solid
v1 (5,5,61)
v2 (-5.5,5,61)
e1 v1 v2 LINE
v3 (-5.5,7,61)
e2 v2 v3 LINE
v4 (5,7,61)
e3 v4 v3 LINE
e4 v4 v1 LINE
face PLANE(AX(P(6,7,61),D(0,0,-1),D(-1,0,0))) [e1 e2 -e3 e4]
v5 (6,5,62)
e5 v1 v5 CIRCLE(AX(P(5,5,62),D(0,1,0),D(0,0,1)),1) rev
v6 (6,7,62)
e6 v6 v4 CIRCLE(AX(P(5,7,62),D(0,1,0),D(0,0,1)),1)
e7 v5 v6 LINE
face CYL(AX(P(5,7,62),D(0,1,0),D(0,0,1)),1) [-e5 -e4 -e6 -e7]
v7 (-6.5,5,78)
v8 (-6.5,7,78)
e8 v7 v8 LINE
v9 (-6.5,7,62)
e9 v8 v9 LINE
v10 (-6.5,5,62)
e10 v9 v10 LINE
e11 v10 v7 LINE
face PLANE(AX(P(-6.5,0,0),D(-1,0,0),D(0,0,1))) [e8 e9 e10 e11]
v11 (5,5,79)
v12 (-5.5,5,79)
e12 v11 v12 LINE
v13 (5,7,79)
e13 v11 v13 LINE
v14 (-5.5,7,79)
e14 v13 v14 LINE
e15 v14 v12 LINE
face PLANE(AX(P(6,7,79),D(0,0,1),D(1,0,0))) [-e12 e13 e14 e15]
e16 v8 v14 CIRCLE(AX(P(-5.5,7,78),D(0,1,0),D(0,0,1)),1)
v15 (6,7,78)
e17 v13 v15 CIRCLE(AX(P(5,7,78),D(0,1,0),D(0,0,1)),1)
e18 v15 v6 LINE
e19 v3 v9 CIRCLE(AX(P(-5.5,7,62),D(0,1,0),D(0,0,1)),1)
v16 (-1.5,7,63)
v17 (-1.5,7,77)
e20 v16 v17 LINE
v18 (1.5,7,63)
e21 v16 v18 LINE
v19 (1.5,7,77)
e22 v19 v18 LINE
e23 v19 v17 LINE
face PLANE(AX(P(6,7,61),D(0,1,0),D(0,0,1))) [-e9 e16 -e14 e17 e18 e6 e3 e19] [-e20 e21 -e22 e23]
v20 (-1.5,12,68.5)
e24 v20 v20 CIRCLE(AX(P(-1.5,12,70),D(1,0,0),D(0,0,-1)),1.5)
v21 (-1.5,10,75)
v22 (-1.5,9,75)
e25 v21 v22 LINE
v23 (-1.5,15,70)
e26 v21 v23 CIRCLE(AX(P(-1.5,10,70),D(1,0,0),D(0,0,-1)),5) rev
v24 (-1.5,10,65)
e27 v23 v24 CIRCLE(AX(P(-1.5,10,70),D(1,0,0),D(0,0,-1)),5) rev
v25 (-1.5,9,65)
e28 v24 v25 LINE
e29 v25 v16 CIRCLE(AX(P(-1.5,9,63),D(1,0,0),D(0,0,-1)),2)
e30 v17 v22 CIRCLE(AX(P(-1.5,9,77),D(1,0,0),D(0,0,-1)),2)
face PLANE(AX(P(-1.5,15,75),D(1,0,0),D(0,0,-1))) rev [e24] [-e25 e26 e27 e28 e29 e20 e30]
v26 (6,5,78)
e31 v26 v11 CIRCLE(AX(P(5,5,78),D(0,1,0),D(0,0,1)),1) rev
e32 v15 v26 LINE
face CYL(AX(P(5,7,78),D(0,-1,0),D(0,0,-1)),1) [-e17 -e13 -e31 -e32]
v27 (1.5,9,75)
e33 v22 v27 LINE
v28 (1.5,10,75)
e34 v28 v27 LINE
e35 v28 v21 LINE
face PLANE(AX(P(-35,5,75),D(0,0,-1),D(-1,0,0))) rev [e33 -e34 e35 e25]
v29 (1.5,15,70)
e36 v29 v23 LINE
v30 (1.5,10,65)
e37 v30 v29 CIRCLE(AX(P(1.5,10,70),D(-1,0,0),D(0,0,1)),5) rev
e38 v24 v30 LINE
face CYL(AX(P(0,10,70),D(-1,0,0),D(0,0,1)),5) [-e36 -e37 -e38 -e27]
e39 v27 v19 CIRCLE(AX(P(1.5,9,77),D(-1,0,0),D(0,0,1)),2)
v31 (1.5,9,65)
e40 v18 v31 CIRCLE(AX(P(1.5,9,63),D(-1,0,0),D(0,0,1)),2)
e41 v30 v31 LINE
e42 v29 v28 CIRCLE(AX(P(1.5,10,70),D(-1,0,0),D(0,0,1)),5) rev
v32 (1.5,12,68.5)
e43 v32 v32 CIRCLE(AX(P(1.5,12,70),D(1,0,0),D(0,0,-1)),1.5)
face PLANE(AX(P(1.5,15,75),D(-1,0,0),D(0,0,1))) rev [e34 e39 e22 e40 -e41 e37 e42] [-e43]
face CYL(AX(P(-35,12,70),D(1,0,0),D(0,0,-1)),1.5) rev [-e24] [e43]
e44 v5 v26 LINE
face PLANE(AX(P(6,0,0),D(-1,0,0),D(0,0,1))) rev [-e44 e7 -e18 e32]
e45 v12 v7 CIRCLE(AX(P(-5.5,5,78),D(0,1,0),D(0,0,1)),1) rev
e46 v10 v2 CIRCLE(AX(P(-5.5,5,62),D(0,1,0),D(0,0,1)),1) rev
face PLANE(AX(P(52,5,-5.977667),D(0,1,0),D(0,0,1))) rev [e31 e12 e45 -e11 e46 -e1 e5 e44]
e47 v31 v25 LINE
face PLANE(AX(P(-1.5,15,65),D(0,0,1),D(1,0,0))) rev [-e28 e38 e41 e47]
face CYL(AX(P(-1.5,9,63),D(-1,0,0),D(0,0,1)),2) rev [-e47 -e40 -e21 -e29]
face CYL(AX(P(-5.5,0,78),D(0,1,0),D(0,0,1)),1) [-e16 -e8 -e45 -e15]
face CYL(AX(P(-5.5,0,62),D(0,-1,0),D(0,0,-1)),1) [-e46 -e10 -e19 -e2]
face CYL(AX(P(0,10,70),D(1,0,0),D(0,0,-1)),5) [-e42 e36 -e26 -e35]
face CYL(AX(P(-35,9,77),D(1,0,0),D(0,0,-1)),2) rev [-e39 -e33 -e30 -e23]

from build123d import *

# Parameters (mm, degrees)
SKETCH1_W                = 70
SKETCH1_H                = 150
BOSS_EXTRUDE1_DEPTH      = 5
SKETCH2_W                = 3
SKETCH2_H                = 15
BOSS_EXTRUDE3_DEPTH      = 20
SKETCH2_5_W              = 16
SKETCH2_5_H              = 22
SKETCH2_5_W_2            = 3
SKETCH2_5_H_2            = 15
BOSS_EXTRUDE4_DEPTH      = 5
CHAMFER1_SIZE            = 3
SKETCH3_R                = 3
CUT_EXTRUDE1_DEPTH       = 89.600225733
CHAMFER3_SIZE            = 1
CHAMFER4_SIZE            = 1
CHAMFER5_SIZE            = 3
CHAMFER6_SIZE            = 3
CHAMFER7_SIZE            = 20
CHAMFER8_SIZE            = 10
SKETCH4_W                = 3
SKETCH4_H                = 10
BOSS_EXTRUDE5_DEPTH      = 10
SKETCH6_R                = 1.5
CUT_EXTRUDE2_DEPTH       = 88.076116128
FILLET1_R                = 5
CHAMFER10_SIZE           = 1
CUT_EXTRUDE3_DEPTH       = 87
BOSS_EXTRUDE6_DEPTH      = 5
BOSS_EXTRUDE6_DEPTH_BACK = 7.5
SKETCH8_W                = 18
SKETCH8_H                = 2
FILLET2_R                = 2
FILLET3_R                = 1


# Some blends are built 0.0001 mm under size
with BuildPart() as part:
    # Sketch1 → Boss-Extrude1 (new body)
    with BuildSketch(Plane(origin=(0, 0, 0), x_dir=(1, 0, 0), z_dir=(0, 1, 0))):
        Rectangle(SKETCH1_W, SKETCH1_H)
    extrude(amount=BOSS_EXTRUDE1_DEPTH)

    # Sketch2 → Boss-Extrude3 (add)
    with BuildSketch(Plane(origin=(0, 5, 0), x_dir=(1, 0, 0), z_dir=(0, 1, 0))):
        with Locations((3.5, 62.5)):
            Rectangle(SKETCH2_W, SKETCH2_H)
        with Locations((-3.5, 62.5)):
            Rectangle(SKETCH2_W, SKETCH2_H)
    extrude(amount=BOSS_EXTRUDE3_DEPTH)

    # Sketch2<5> → Boss-Extrude4 (add)
    with BuildSketch(Plane(origin=(0, 5, 0), x_dir=(1, 0, 0), z_dir=(0, 1, 0))):
        with Locations((0, 62.5)):
            Rectangle(SKETCH2_5_W, SKETCH2_5_H)
        with Locations((-3.5, 62.5)):
            Rectangle(SKETCH2_5_W_2, SKETCH2_5_H_2, mode=Mode.SUBTRACT)
        with Locations((3.5, 62.5)):
            Rectangle(SKETCH2_5_W_2, SKETCH2_5_H_2, mode=Mode.SUBTRACT)
    extrude(amount=BOSS_EXTRUDE4_DEPTH)

    # Chamfer1
    chamfer1_edges = [part.edges().sort_by_distance(p)[0] for p in [
        (0, 10, -73.5),
        (0, 10, -51.5),
    ]]
    chamfer(chamfer1_edges, length=CHAMFER1_SIZE)

    # Sketch3 → Cut-Extrude1 (cut, through all)
    with BuildSketch(Plane(origin=(5, 0, 0), x_dir=(0, 0, -1), z_dir=(1, 0, 0))):
        with Locations((62.5, 23.2)):
            Circle(SKETCH3_R)
    extrude(amount=-CUT_EXTRUDE1_DEPTH, mode=Mode.SUBTRACT)

    # Chamfer3
    # the kernel refuses this chamfer: 1, 0.714285714 mm, written as the material it takes off along each edge
    with BuildSketch(Plane(origin=(-7.571682988, 25, -64.9), x_dir=(0, -0.8672694366120031, -0.4978390546338231), z_dir=(1, 0, 0)), Plane(origin=(-0.571682988, 25, -64.9), x_dir=(0, -0.8672694366120031, -0.4978390546338231), z_dir=(1, 0, 0))) as chamfer3_piece_1:
        with BuildLine():
            Line((0.73254251, 0), (CHAMFER3_SIZE * 0.497839054634, CHAMFER3_SIZE * 0.867269436612))
            Line((CHAMFER3_SIZE * 0.497839054634, CHAMFER3_SIZE * 0.867269436612), (0, 0))
            ThreePointArc((0, 0), (0.371569513, 0.022438375), (0.73254251, 0))
        make_face()
    extrude(amount=8.143365976, mode=Mode.SUBTRACT)
    with BuildSketch(Plane(origin=(-7.571682988, 25, -60.1), x_dir=(0, 0, 1), z_dir=(1, 0, 0)), Plane(origin=(-0.571682988, 25, -60.1), x_dir=(0, 0, 1), z_dir=(1, 0, 0))) as chamfer3_piece_2:
        with BuildLine():
            Line((CHAMFER3_SIZE, 0), (0.36468827, 0.63531173))
            ThreePointArc((0.36468827, 0.63531173), (0.204441932, 0.311080183), (0, 0))
            Line((0, 0), (CHAMFER3_SIZE, 0))
        make_face()
    extrude(amount=8.143365976, mode=Mode.SUBTRACT)

    # Chamfer4
    chamfer4_edges = [part.edges().sort_by_distance(p)[0] for p in [
        (3.5, 25, -70),
        (3.5, 25, -55),
        (-3.5, 25, -70),
        (-3.5, 25, -55),
    ]]
    chamfer(chamfer4_edges, length=CHAMFER4_SIZE)

    # Chamfer5
    # the kernel refuses this chamfer: 3 mm, written as the material it adds along each edge
    with BuildSketch(Plane(origin=(-8, 5, -73.5), x_dir=(0, 1, 0), z_dir=(0, 0, 1))) as chamfer5_piece_1_section:
        Polygon((CHAMFER5_SIZE, 0), (0, CHAMFER5_SIZE), (0, 0), align=None)
    chamfer5_piece_1 = extrude(amount=22, mode=Mode.PRIVATE)
    chamfer5_piece_1 = split(chamfer5_piece_1, bisect_by=Plane(origin=(-8, 17, -61.5), z_dir=(0, -0.7071067811865476, -0.7071067811865476)), keep=Keep.TOP, mode=Mode.PRIVATE)
    chamfer5_piece_1 = split(chamfer5_piece_1, bisect_by=Plane(origin=(-8, 6, -74.5), z_dir=(0, -0.7071067811865476, 0.7071067811865476)), keep=Keep.TOP, mode=Mode.PRIVATE)
    add(chamfer5_piece_1)
    with BuildSketch(Plane(origin=(8, 5, -51.5), x_dir=(0, 1, 0), z_dir=(0, 0, -1))) as chamfer5_piece_2_section:
        Polygon((CHAMFER5_SIZE, 0), (0, CHAMFER5_SIZE), (0, 0), align=None)
    chamfer5_piece_2 = extrude(amount=22, mode=Mode.PRIVATE)
    chamfer5_piece_2 = split(chamfer5_piece_2, bisect_by=Plane(origin=(8, 6, -50.5), z_dir=(0, -0.7071067811865476, -0.7071067811865476)), keep=Keep.TOP, mode=Mode.PRIVATE)
    chamfer5_piece_2 = split(chamfer5_piece_2, bisect_by=Plane(origin=(8, 17, -63.5), z_dir=(0, -0.7071067811865476, 0.7071067811865476)), keep=Keep.TOP, mode=Mode.PRIVATE)
    add(chamfer5_piece_2)

    # Chamfer6
    chamfer6_edges = [part.edges().sort_by_distance(p)[0] for p in [
        (-5, 10, -62.5),
        (5, 10, -62.5),
    ]]
    chamfer(chamfer6_edges, length=CHAMFER6_SIZE - 0.0001)  # a hair under: the kernel refuses the full size

    # Chamfer7
    chamfer7_edges = [part.edges().sort_by_distance(p)[0] for p in [
        (35, 2.5, 75),
        (-35, 2.5, 75),
    ]]
    chamfer(chamfer7_edges, length=CHAMFER7_SIZE)

    # Chamfer8
    chamfer8_edges = [part.edges().sort_by_distance(p)[0] for p in [
        (-35, 2.5, -75),
        (35, 2.5, -75),
    ]]
    chamfer(chamfer8_edges, length=CHAMFER8_SIZE)

    # Sketch4 → Boss-Extrude5 (add)
    with BuildSketch(Plane(origin=(0, 5, 0), x_dir=(1, 0, 0), z_dir=(0, 1, 0))):
        with Locations((0, -70)):
            Rectangle(SKETCH4_W, SKETCH4_H)
    extrude(amount=BOSS_EXTRUDE5_DEPTH)

    # Sketch6 → Cut-Extrude2 (cut, through all)
    with BuildSketch(Plane(origin=(1.5, 0, 0), x_dir=(0, 0, -1), z_dir=(1, 0, 0))):
        with Locations((-70, 12)):
            Circle(SKETCH6_R)
    extrude(amount=-CUT_EXTRUDE2_DEPTH, mode=Mode.SUBTRACT)

    # Fillet1
    fillet1_edges = [part.edges().sort_by_distance(p)[0] for p in [
        (0, 15, 75),
        (0, 15, 65),
    ]]
    fillet(fillet1_edges, radius=FILLET1_R - 0.0001)  # a hair under: the kernel refuses the full size

    # Chamfer10
    chamfer10_edges = [part.edges().sort_by_distance(p)[0] for p in [
        (0, 0, 75),
        (35, 0, -5),
        (25, 0, 65),
        (-25, 0, 65),
        (-35, 0, -5),
        (0, 0, -75),
        (30, 0, -70),
        (-30, 0, -70),
    ]]
    chamfer(chamfer10_edges, length=CHAMFER10_SIZE)

    # Sketch7 → Cut-Extrude3 (cut)
    with BuildSketch(Plane.ZY.offset(35)):
        Polygon((-104.766483953, 57.568464944), (-5.977667253, 57.568464944), (-5.977667253, 5), (81.485043075, 5), (81.485043075, -30.208859449), (-5.977667253, -30.208859449), (-5.977667253, -7.084725604), (-104.766483953, -7.084725604), align=None)
    extrude(amount=-CUT_EXTRUDE3_DEPTH, mode=Mode.SUBTRACT)

    # Sketch8 → Boss-Extrude6 (add, two sides: drawn at the far end of the back side and taken through both)
    with BuildSketch(Plane.ZY.offset(1.5).offset(-BOSS_EXTRUDE6_DEPTH_BACK)):
        with Locations((70, 6)):
            Rectangle(SKETCH8_W, SKETCH8_H)
    extrude(amount=BOSS_EXTRUDE6_DEPTH + BOSS_EXTRUDE6_DEPTH_BACK)

    # Fillet2
    fillet2_edges = [part.edges().sort_by_distance(p)[0] for p in [
        (0, 7, 75),
        (0, 7, 65),
    ]]
    fillet(fillet2_edges, radius=FILLET2_R)

    # Fillet3
    fillet3_edges = [part.edges().sort_by_distance(p)[0] for p in [
        (6, 6, 61),
        (6, 6, 79),
        (-6.5, 6, 61),
        (-6.5, 6, 79),
    ]]
    fillet(fillet3_edges, radius=FILLET3_R)


solid = part.part
